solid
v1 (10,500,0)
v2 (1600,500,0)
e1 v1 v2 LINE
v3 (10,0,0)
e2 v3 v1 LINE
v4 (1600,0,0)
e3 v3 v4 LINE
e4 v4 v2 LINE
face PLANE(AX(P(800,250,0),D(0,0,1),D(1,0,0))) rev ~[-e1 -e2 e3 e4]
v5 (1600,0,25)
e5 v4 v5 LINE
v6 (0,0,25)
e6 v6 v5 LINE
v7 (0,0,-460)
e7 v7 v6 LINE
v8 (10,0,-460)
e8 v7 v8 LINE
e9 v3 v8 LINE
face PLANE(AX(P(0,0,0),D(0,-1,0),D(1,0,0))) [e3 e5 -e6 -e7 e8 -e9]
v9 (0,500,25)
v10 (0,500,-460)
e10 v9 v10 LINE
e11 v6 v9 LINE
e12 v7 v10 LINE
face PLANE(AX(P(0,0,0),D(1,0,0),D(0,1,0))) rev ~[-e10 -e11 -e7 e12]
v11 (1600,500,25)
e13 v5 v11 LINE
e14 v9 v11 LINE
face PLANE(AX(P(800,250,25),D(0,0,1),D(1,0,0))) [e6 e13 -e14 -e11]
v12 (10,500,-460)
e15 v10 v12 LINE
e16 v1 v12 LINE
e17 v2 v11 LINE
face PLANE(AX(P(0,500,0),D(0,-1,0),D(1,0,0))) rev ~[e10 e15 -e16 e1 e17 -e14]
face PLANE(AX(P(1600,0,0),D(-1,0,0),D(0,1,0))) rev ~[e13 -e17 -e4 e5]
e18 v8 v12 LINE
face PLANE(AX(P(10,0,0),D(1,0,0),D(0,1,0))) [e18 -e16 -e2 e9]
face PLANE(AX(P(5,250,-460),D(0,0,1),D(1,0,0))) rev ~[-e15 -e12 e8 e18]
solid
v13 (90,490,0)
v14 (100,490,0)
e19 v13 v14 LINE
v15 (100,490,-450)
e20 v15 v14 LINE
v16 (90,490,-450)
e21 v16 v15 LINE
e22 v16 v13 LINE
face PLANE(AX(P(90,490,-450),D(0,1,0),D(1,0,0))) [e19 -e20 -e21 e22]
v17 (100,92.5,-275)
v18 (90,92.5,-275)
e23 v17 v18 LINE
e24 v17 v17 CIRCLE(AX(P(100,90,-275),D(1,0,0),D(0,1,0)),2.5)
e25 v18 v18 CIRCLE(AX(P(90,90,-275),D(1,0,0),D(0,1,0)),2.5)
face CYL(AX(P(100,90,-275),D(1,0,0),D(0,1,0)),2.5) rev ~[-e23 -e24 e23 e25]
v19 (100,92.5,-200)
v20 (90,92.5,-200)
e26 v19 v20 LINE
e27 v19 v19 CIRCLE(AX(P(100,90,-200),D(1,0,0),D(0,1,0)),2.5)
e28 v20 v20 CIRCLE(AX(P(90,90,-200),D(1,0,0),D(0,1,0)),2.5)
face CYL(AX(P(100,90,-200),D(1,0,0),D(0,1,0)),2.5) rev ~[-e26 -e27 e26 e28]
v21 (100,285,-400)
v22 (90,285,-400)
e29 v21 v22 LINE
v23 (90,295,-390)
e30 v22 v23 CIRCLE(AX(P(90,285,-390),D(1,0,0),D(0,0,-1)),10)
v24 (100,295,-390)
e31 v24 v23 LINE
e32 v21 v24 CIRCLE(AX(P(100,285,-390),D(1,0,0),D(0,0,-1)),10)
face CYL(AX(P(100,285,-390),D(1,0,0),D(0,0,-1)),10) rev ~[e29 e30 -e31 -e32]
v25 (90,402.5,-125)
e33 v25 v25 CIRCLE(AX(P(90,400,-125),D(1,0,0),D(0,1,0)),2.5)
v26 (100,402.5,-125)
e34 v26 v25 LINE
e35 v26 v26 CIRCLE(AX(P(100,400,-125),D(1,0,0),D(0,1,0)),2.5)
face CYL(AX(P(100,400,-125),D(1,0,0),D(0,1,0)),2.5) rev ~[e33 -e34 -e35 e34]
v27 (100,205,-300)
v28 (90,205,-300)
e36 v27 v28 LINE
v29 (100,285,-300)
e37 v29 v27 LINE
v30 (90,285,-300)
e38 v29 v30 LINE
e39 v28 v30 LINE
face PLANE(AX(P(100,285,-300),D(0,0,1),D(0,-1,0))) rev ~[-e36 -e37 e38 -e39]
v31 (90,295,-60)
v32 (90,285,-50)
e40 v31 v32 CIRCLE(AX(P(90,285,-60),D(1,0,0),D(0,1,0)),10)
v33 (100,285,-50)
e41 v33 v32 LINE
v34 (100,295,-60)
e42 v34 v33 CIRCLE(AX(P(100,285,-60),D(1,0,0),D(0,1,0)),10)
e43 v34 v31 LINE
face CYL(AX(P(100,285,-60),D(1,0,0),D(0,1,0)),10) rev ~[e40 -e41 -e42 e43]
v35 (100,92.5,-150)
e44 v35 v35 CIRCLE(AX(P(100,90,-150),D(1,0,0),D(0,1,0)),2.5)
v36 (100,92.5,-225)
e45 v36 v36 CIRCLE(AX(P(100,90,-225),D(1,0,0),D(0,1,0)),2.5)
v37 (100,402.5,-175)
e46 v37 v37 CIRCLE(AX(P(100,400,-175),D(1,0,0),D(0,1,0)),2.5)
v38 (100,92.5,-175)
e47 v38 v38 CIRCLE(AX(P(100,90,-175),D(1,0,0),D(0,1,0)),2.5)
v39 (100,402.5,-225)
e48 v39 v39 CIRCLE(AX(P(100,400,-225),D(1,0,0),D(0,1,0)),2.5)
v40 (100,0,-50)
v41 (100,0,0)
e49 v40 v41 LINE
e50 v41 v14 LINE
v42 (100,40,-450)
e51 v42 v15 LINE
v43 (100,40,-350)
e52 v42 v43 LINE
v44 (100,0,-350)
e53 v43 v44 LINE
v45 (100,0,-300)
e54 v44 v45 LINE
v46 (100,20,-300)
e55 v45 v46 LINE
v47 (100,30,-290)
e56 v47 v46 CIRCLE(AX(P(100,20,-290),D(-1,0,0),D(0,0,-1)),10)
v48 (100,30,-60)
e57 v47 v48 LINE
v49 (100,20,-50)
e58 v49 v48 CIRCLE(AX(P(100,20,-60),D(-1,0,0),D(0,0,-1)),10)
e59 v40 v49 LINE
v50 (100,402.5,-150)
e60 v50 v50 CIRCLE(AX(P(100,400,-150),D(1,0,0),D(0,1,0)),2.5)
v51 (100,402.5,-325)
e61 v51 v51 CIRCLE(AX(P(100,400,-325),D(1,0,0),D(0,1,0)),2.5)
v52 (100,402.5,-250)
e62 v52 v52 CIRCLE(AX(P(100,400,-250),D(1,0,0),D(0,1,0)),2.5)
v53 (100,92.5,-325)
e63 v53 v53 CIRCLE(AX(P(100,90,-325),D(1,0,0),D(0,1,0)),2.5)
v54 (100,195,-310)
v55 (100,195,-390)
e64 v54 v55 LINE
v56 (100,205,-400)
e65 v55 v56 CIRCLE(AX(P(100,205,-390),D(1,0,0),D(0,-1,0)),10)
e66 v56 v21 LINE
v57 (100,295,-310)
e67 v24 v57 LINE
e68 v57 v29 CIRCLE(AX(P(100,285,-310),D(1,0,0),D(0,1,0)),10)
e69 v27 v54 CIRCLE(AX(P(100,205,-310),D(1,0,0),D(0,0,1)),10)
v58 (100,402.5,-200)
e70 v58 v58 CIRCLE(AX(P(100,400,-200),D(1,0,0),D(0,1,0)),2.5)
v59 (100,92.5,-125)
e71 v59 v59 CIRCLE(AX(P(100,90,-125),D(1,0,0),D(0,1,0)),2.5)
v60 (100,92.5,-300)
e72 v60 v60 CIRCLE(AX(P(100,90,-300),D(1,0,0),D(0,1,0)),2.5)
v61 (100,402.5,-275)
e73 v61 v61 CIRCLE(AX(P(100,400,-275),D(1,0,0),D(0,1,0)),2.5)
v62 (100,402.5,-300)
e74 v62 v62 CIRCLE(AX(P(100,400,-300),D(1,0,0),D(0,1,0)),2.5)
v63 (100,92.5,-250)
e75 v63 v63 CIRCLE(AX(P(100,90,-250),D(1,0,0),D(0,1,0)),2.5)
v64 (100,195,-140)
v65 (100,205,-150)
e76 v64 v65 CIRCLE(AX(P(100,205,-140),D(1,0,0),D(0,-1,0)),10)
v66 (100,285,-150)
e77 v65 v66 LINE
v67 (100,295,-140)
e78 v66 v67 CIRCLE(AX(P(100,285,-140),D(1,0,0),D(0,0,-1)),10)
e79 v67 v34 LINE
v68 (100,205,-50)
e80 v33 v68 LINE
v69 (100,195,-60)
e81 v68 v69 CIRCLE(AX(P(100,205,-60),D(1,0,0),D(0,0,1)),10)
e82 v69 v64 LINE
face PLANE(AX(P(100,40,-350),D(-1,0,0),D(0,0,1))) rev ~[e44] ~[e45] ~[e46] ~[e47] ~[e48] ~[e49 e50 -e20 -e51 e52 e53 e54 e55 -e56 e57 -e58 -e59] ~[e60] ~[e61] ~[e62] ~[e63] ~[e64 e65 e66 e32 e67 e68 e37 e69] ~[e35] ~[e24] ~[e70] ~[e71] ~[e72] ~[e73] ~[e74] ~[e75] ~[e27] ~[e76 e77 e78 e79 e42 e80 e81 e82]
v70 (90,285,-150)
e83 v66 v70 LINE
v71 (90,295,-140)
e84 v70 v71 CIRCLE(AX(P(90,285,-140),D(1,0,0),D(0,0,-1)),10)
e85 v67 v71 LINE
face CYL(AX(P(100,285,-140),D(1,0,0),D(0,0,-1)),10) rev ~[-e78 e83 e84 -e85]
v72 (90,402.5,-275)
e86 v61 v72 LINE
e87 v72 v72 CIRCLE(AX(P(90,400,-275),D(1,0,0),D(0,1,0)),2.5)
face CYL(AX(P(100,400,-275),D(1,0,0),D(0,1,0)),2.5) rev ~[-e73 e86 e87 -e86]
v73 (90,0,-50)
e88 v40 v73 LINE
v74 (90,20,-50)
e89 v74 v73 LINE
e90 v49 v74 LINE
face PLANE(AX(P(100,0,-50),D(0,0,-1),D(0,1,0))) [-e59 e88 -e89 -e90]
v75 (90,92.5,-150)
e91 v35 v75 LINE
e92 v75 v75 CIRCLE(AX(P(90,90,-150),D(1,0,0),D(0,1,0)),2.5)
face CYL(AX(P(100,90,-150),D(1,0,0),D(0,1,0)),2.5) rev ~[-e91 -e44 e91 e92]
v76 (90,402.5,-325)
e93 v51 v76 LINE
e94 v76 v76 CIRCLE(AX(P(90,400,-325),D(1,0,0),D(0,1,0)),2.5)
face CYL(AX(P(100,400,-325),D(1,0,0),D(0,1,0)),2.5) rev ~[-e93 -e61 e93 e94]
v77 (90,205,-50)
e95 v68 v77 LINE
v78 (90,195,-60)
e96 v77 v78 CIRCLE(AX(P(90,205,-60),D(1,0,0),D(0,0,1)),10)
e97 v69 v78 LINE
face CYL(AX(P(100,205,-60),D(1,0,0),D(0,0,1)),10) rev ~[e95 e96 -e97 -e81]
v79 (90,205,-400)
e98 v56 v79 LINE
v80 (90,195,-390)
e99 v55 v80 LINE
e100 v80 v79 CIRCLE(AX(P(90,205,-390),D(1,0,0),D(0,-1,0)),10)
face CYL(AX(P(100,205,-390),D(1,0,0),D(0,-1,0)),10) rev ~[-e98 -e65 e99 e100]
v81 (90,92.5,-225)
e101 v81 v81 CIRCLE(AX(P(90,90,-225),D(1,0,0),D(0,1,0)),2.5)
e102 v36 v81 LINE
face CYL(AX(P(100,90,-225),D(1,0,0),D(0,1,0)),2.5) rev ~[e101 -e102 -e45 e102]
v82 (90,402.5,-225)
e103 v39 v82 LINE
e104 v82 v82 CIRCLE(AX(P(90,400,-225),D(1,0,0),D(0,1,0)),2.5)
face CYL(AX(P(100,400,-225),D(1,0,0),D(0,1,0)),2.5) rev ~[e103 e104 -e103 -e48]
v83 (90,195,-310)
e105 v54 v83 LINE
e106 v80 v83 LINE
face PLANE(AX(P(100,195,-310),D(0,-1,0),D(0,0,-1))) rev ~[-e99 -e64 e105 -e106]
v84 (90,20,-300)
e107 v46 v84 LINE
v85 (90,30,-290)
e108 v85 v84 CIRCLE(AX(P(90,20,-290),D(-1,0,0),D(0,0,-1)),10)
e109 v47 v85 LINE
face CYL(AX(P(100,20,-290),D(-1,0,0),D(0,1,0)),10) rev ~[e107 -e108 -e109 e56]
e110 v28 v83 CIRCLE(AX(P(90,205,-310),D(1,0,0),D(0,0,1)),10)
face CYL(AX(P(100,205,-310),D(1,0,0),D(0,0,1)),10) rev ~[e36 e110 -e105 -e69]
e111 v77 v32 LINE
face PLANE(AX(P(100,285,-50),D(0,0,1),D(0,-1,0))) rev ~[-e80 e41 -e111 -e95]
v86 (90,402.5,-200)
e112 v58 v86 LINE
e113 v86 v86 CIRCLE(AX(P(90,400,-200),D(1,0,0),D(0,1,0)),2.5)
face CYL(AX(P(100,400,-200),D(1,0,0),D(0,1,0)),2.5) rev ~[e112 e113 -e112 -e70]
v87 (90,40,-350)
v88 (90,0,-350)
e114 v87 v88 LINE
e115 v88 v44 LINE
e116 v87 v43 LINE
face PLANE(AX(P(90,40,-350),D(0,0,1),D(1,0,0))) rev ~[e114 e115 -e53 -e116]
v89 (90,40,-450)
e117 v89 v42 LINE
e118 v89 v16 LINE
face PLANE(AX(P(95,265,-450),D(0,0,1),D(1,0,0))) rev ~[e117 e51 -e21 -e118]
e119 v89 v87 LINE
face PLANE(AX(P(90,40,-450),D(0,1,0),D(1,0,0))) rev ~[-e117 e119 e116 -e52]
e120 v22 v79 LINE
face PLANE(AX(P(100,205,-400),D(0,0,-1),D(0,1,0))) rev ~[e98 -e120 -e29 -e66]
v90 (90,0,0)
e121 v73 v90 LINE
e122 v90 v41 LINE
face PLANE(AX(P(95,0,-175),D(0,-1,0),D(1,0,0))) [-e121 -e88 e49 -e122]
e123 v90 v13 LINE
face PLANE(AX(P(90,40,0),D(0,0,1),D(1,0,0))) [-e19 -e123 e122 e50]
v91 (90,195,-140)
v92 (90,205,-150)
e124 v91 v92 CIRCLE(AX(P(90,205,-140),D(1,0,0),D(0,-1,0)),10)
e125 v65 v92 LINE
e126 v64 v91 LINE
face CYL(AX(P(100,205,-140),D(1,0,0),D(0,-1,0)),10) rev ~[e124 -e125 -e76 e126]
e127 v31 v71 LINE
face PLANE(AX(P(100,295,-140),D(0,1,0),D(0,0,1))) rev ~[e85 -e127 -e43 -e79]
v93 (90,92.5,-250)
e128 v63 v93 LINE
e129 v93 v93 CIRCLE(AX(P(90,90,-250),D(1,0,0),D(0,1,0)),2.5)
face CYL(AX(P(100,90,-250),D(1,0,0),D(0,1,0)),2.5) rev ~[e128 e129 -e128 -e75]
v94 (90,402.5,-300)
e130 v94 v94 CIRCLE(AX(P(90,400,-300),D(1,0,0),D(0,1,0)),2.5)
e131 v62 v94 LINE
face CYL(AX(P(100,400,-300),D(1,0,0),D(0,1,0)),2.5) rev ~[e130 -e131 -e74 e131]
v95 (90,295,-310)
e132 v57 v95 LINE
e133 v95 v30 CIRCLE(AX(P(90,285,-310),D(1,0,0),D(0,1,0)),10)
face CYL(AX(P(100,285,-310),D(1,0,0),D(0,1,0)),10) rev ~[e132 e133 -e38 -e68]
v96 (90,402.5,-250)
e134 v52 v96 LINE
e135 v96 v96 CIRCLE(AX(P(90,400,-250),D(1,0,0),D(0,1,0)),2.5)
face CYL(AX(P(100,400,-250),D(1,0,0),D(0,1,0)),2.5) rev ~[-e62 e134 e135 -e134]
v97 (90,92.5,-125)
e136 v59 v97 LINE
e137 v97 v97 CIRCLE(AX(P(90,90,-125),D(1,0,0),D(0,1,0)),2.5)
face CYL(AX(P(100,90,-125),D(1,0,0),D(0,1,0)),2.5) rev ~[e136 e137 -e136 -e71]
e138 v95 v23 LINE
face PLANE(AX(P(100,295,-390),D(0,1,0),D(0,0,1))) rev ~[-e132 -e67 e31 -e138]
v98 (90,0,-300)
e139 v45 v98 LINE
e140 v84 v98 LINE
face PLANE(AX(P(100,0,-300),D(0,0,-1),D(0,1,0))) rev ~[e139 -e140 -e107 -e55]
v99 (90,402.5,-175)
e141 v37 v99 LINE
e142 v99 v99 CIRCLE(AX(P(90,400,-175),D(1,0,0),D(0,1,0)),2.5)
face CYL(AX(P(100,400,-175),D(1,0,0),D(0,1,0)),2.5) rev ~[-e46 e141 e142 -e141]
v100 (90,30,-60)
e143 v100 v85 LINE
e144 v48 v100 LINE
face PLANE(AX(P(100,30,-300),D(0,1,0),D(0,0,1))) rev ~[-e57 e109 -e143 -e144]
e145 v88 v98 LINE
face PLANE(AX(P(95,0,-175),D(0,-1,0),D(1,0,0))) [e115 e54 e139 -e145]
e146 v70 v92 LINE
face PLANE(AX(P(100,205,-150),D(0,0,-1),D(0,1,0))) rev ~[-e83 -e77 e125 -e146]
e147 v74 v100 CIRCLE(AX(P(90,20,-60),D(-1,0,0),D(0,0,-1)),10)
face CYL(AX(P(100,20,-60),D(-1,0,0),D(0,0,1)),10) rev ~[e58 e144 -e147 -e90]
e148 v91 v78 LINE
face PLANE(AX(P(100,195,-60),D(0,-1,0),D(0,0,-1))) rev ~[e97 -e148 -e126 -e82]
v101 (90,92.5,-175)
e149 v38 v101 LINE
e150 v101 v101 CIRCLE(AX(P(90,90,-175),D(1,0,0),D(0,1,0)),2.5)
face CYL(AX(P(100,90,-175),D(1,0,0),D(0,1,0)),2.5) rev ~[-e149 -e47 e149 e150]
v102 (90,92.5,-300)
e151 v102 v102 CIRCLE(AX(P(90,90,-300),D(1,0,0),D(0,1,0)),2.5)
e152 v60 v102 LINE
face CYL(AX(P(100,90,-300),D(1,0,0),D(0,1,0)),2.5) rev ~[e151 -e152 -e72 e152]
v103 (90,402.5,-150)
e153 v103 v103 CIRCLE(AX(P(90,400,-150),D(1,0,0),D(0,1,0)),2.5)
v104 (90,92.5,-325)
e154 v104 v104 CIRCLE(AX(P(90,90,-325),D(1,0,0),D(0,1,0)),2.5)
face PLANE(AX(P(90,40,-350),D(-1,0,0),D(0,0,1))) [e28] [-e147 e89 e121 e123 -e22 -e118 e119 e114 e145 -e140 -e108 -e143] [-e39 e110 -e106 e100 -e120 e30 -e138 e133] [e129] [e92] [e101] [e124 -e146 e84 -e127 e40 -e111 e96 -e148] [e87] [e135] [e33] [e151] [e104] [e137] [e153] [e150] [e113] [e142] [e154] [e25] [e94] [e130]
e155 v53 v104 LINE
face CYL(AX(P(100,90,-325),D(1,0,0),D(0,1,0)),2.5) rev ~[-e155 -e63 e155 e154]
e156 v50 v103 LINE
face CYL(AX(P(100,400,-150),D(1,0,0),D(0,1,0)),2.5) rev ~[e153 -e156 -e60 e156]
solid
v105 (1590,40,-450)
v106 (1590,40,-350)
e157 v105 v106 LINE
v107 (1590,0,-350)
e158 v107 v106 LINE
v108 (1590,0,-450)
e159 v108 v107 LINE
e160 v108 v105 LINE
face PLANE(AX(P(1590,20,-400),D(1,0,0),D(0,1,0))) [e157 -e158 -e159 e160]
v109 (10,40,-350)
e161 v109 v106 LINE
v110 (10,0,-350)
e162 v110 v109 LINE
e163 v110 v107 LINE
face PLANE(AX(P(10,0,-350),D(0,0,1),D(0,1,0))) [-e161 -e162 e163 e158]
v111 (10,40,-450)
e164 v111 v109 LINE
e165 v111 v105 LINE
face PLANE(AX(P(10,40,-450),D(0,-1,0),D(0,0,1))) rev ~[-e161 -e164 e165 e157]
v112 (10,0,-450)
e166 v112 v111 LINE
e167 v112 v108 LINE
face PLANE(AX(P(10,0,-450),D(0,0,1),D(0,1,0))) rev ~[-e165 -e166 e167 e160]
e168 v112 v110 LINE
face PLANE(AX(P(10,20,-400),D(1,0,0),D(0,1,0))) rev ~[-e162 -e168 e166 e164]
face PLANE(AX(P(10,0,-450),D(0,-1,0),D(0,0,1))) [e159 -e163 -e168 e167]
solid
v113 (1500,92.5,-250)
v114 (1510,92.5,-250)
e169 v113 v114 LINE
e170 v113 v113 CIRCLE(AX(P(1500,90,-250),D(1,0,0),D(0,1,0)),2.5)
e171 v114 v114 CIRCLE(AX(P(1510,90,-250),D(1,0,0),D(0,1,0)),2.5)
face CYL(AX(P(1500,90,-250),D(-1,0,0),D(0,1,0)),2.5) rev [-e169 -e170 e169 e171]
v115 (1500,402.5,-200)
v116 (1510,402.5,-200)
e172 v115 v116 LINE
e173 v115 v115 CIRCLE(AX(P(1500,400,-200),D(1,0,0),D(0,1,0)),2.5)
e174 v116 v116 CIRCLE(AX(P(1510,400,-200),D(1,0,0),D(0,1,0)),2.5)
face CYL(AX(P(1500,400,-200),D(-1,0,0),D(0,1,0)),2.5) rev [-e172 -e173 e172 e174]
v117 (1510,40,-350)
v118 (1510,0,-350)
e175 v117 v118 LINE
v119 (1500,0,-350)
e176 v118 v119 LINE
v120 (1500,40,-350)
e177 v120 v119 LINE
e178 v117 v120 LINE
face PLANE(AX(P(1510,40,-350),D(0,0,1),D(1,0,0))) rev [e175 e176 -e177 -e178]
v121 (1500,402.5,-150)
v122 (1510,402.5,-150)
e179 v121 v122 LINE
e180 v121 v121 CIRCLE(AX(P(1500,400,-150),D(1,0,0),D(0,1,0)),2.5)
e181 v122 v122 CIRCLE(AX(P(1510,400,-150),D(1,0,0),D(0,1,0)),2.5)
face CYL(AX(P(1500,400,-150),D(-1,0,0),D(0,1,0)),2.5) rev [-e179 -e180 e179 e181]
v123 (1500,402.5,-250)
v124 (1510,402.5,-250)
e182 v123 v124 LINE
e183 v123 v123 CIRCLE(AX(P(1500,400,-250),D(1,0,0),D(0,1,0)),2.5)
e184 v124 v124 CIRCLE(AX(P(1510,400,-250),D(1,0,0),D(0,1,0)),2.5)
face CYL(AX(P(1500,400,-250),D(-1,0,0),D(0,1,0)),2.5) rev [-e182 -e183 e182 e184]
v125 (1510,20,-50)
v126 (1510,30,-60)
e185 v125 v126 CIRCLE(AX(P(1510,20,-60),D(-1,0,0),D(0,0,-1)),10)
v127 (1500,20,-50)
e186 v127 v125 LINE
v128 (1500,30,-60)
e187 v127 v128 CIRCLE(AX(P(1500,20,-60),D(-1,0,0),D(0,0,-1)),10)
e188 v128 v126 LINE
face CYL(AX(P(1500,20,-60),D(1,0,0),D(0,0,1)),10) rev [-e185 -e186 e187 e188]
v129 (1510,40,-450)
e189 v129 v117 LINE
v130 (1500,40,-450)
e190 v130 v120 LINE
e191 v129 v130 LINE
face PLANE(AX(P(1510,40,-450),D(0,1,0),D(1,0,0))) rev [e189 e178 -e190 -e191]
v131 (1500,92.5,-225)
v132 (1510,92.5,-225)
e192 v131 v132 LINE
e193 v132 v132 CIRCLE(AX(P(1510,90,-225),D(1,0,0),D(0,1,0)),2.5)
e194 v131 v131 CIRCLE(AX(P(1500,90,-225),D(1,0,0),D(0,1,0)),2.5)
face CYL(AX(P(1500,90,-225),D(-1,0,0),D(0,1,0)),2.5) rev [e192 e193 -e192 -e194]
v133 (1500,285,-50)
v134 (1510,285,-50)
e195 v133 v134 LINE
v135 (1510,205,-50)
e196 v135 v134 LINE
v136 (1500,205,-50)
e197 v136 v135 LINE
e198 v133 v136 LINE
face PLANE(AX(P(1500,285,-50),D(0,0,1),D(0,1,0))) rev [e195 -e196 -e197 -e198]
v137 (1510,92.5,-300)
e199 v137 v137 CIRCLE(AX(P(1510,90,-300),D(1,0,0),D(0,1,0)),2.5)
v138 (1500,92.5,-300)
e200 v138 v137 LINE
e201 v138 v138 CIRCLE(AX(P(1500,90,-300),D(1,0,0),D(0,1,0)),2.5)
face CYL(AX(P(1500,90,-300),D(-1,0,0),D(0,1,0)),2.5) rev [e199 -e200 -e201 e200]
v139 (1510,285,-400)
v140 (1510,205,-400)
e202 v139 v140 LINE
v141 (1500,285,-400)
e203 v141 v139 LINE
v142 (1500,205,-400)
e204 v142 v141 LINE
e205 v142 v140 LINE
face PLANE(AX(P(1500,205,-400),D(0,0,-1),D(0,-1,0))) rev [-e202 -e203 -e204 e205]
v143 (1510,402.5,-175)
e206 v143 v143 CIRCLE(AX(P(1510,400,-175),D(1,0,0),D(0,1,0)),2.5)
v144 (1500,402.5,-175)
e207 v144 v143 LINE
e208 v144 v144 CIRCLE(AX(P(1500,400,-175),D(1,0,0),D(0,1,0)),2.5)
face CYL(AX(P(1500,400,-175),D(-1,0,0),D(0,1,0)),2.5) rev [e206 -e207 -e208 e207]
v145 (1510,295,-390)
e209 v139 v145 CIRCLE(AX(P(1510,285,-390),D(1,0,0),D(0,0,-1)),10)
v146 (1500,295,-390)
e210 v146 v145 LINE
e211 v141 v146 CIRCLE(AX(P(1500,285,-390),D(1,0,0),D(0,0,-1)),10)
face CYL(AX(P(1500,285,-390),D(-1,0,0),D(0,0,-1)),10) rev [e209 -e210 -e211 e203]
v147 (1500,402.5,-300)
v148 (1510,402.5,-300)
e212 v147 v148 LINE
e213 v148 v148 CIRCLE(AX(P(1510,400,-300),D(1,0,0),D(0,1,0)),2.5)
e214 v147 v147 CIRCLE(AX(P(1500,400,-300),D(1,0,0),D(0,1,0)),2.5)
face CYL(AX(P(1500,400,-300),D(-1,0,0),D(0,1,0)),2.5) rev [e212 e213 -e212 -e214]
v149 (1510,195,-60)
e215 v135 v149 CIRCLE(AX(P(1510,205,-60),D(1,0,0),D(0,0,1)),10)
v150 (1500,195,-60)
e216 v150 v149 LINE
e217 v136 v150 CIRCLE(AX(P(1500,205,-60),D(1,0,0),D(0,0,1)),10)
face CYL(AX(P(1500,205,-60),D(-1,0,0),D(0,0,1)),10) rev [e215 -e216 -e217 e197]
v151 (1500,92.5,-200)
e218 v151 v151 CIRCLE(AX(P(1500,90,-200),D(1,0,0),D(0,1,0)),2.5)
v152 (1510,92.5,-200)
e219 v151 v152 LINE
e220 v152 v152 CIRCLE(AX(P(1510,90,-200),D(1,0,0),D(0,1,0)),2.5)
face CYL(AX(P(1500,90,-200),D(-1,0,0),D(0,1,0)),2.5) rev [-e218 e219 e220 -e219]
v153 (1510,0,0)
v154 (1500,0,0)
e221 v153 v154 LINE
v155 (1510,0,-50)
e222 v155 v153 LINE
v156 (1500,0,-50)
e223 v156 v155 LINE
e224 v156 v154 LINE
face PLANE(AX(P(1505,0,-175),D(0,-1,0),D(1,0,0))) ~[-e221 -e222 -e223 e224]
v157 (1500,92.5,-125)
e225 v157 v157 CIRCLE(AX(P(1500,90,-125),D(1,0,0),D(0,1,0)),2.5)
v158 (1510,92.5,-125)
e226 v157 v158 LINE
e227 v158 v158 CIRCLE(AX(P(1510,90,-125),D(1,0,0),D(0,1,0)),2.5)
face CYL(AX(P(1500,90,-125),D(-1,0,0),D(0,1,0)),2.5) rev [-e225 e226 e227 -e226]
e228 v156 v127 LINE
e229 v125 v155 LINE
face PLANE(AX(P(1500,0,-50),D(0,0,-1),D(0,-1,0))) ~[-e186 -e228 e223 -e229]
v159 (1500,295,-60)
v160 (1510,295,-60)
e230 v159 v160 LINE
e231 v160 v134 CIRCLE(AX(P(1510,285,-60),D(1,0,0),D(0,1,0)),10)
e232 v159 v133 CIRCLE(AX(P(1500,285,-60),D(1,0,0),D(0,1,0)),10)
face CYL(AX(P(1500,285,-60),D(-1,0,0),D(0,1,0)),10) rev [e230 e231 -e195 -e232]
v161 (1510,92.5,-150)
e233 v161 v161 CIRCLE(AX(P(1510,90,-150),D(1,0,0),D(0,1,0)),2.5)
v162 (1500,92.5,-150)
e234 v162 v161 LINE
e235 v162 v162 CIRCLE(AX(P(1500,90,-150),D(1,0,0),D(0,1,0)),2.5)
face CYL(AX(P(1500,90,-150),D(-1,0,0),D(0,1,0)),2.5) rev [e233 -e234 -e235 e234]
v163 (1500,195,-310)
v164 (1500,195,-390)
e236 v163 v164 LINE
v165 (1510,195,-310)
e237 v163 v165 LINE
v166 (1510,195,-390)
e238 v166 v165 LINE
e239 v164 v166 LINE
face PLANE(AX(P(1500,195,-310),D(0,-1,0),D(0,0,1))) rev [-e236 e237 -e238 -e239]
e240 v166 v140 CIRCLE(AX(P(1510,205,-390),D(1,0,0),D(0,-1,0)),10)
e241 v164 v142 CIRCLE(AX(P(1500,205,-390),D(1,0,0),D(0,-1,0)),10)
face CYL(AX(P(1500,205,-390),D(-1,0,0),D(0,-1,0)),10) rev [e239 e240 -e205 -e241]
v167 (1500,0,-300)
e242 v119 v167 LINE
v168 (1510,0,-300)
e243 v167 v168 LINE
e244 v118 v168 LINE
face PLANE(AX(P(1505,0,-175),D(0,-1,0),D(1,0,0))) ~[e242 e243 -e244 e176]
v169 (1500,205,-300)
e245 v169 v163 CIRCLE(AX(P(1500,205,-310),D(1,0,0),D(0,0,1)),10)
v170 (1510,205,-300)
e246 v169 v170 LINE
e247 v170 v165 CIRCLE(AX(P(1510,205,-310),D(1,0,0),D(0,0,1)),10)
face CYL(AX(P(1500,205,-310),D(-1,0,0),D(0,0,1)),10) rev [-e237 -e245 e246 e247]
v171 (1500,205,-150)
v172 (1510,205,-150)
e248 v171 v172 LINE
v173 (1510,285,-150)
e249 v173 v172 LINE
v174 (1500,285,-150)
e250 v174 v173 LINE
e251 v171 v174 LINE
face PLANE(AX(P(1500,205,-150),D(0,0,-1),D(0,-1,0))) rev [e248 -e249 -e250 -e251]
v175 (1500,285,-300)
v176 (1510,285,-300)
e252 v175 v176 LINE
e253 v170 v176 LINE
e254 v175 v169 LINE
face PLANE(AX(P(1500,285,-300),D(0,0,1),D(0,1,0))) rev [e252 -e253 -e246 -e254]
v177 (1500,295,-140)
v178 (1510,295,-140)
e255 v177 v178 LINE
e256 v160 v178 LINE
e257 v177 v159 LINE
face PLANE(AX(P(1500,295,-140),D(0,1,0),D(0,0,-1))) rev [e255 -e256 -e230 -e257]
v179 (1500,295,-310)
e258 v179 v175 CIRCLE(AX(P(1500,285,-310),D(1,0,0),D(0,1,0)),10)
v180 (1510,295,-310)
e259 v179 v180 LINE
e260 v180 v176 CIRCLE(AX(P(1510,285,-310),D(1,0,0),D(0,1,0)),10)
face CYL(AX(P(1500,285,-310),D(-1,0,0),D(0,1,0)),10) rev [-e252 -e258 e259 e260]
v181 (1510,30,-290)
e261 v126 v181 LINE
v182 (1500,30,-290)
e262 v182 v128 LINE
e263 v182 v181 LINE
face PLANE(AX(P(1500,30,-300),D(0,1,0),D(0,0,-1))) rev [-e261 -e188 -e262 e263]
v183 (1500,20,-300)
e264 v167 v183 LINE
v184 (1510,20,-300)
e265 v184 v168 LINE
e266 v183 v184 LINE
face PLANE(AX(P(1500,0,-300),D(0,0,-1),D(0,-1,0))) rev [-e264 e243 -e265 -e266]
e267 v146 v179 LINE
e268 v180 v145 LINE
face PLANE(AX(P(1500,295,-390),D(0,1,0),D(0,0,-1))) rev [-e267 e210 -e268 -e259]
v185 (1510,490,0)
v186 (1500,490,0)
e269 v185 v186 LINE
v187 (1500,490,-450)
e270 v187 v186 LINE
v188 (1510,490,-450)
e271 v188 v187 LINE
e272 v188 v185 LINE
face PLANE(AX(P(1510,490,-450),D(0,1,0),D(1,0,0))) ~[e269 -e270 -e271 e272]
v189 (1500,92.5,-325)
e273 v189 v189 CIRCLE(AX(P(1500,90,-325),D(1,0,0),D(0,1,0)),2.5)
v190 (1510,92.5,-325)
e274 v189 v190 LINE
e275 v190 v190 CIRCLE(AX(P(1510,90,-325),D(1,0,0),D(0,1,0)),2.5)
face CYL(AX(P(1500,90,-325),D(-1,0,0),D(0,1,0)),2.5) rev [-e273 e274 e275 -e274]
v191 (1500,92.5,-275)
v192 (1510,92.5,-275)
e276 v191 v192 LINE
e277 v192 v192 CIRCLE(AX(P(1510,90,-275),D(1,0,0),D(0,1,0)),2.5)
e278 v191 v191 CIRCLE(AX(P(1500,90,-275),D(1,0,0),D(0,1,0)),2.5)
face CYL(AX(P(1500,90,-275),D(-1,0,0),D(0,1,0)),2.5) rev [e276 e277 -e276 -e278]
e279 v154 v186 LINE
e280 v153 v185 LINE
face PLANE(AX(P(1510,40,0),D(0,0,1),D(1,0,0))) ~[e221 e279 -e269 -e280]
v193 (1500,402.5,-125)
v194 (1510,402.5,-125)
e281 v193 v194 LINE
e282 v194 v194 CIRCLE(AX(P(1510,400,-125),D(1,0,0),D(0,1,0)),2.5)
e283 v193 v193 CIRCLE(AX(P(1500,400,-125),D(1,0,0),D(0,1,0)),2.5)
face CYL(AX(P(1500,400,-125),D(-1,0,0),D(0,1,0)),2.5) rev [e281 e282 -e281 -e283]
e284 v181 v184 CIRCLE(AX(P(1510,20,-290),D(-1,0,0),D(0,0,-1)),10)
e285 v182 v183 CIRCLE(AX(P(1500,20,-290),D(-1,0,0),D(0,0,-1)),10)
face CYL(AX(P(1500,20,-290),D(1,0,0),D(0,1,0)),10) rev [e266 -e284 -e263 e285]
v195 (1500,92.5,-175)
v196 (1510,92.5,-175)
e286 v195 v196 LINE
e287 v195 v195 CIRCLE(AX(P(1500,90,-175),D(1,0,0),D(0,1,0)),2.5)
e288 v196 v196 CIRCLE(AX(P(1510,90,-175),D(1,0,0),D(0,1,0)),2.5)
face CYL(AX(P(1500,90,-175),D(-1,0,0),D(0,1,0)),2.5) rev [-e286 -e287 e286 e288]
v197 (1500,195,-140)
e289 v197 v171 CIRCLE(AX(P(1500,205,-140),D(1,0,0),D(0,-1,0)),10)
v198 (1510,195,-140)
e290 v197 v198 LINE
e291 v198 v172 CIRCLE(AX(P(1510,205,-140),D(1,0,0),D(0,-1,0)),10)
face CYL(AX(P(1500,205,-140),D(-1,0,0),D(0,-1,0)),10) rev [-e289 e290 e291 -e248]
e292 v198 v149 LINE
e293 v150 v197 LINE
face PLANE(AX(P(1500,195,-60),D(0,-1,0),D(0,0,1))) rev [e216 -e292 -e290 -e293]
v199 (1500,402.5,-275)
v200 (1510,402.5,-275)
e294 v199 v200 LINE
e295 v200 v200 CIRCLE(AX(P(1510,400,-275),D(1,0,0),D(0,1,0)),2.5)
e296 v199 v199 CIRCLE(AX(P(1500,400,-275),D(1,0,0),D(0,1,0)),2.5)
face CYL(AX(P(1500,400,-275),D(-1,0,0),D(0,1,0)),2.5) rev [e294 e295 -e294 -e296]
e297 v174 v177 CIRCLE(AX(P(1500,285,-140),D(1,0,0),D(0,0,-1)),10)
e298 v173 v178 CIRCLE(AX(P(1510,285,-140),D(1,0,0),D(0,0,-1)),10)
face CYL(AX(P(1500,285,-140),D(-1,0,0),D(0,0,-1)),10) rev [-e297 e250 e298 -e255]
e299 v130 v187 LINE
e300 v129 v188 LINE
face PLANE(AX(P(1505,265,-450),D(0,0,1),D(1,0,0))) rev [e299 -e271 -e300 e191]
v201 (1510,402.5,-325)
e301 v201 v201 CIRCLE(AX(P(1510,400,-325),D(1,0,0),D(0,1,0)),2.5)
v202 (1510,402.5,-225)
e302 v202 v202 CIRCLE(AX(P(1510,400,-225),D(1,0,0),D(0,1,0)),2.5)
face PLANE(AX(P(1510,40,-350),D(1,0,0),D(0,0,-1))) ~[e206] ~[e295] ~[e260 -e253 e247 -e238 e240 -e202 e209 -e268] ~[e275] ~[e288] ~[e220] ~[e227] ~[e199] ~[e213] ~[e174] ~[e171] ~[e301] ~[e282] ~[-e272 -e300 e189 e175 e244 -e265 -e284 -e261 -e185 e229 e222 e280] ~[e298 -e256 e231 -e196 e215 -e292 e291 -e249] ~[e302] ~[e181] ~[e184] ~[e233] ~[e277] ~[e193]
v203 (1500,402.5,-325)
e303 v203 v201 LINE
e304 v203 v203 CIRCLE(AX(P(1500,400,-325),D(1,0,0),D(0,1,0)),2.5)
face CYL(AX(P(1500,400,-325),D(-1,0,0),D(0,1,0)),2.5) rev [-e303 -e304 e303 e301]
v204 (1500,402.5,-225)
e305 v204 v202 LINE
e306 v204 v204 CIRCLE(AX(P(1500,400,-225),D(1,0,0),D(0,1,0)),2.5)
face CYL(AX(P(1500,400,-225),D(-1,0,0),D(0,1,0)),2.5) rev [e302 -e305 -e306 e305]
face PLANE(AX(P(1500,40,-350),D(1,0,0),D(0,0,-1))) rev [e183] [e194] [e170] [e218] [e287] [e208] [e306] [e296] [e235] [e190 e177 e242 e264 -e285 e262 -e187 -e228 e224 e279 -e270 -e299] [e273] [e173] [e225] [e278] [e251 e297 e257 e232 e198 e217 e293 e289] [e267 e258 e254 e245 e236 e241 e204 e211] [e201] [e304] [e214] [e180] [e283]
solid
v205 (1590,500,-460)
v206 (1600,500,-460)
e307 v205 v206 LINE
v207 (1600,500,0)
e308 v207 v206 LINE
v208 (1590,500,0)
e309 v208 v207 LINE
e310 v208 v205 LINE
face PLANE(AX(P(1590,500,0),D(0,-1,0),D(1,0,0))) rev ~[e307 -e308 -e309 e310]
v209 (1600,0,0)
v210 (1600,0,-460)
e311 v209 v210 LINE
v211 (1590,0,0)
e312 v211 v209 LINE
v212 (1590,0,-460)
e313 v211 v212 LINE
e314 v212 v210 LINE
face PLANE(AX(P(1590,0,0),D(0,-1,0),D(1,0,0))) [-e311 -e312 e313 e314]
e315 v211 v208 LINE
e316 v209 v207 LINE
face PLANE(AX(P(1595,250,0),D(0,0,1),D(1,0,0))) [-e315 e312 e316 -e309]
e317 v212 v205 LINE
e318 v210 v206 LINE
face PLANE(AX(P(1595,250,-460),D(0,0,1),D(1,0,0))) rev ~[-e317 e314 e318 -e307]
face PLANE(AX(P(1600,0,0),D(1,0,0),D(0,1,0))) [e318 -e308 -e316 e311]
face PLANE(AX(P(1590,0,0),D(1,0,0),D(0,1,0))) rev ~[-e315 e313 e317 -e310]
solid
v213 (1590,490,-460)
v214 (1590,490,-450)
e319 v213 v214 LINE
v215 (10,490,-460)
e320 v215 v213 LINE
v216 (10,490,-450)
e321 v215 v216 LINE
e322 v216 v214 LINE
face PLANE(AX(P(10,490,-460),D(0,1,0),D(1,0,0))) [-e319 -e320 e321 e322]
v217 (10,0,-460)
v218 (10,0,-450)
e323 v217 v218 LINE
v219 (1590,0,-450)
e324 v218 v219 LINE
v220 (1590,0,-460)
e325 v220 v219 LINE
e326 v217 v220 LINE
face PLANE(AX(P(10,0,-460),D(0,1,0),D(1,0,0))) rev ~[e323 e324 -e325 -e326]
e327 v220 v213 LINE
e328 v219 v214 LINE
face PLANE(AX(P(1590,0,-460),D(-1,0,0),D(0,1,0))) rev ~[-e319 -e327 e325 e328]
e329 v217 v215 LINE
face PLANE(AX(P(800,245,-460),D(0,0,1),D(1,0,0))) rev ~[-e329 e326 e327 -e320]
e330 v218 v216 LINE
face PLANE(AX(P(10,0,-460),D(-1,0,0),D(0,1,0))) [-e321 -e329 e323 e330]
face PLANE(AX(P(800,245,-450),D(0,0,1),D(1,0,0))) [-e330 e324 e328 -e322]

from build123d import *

# Parameters (mm, degrees)
F0_W      = 1600
F0_H      = 500
F1_DEPTH  = 25
F3_W      = 1580
F3_H      = 490
F4_DEPTH  = 10
F5_W      = 10
F5_H      = 500
F6_DEPTH  = 460
F7_W      = 10
F7_H      = 500
F8_DEPTH  = 460
F9_W      = 40
F9_H      = 100
F10_DEPTH = 1580
F11_W     = 10
F11_H     = 450
F12_DEPTH = 450
F13_W     = 10
F13_H     = 350
F14_DEPTH = 40
F16_W     = 30
F16_H     = 250
F17_DEPTH = 100.001
F18_R     = 10
F20_DEPTH = 100.001
F21_R     = 2.5
F22_DEPTH = 100.001


with BuildPart() as f1:
    # F0 (on Top) → F1 (new body)
    with BuildSketch(Plane.XY):
        with Locations((800, 250)):
            Rectangle(F0_W, F0_H)
    extrude(amount=F1_DEPTH)

    # F5 (on face) → F6 (join, through all)
    with BuildSketch(Plane.XY):
        with Locations((5, 250)):
            Rectangle(F5_W, F5_H)
    extrude(amount=-F6_DEPTH)


with BuildPart() as f4:
    # F3 (on offset) → F4 (new body)
    with BuildSketch(Plane.XY.offset(-460)):
        with Locations((800, 245)):
            Rectangle(F3_W, F3_H)
    extrude(amount=F4_DEPTH)


with BuildPart() as f8:
    # F7 (on face) → F8 (new body, through all)
    with BuildSketch(Plane.XY):
        with Locations((1595, 250)):
            Rectangle(F7_W, F7_H)
    extrude(amount=-F8_DEPTH)


with BuildPart() as f10:
    # F9 (on face) → F10 (new body, through all)
    with BuildSketch(Plane.YZ.offset(10)):
        with Locations((20, -400)):
            Rectangle(F9_W, F9_H)
    extrude(amount=F10_DEPTH)


with BuildPart() as f12:
    # F11 (on face) → F12 (new body, through all)
    with BuildSketch(Plane.XY.offset(-450)):
        with Locations((95, 265)):
            Rectangle(F11_W, F11_H)
    extrude(amount=F12_DEPTH)

    # F13 (on face) → F14 (join, through all)
    with BuildSketch(Plane.XZ.offset(-40)):
        with Locations((95, -175)):
            Rectangle(F13_W, F13_H)
    extrude(amount=F14_DEPTH)

    # F15: union 

    # F16 (on face) → F17 (cut, through all)
    with BuildSketch(Plane.YZ.offset(100)):
        with Locations((15, -175)):
            Rectangle(F16_W, F16_H)
    extrude(amount=-F17_DEPTH, mode=Mode.SUBTRACT)

    # F18
    f18_edges = [f12.edges().sort_by_distance(p)[0] for p in [
        (95, 30, -50),
        (95, 30, -300),
    ]]
    fillet(f18_edges, radius=F18_R)

    # F19 (on face) → F20 (cut, through all)
    with BuildSketch(Plane.YZ.offset(100)):
        with BuildLine():
            Line((285, -50), (205, -50))
            ThreePointArc((205, -50), (197.9289321881, -52.9289321881), (195, -60))
            Line((195, -60), (195, -140))
            ThreePointArc((195, -140), (197.9289321881, -147.0710678119), (205, -150))
            Line((205, -150), (285, -150))
            ThreePointArc((285, -150), (292.0710678119, -147.0710678119), (295, -140))
            Line((295, -140), (295, -60))
            ThreePointArc((295, -60), (292.0710678119, -52.9289321881), (285, -50))
        make_face()
        with BuildLine():
            Line((285, -300), (205, -300))
            ThreePointArc((205, -300), (197.9289321881, -302.9289321881), (195, -310))
            Line((195, -310), (195, -390))
            ThreePointArc((195, -390), (197.9289321881, -397.0710678119), (205, -400))
            Line((205, -400), (285, -400))
            ThreePointArc((285, -400), (292.0710678119, -397.0710678119), (295, -390))
            Line((295, -390), (295, -310))
            ThreePointArc((295, -310), (292.0710678119, -302.9289321881), (285, -300))
        make_face()
    extrude(amount=-F20_DEPTH, mode=Mode.SUBTRACT)

    # F21 (on face) → F22 (cut, through all)
    with BuildSketch(Plane.YZ.offset(100)):
        with Locations((90, -325)):
            Circle(F21_R)
        with Locations((90, -300)):
            Circle(F21_R)
        with Locations((90, -275)):
            Circle(F21_R)
        with Locations((90, -250)):
            Circle(F21_R)
        with Locations((90, -225)):
            Circle(F21_R)
        with Locations((90, -200)):
            Circle(F21_R)
        with Locations((90, -175)):
            Circle(F21_R)
        with Locations((90, -150)):
            Circle(F21_R)
        with Locations((90, -125)):
            Circle(F21_R)
        with Locations((400, -325)):
            Circle(F21_R)
        with Locations((400, -300)):
            Circle(F21_R)
        with Locations((400, -275)):
            Circle(F21_R)
        with Locations((400, -250)):
            Circle(F21_R)
        with Locations((400, -225)):
            Circle(F21_R)
        with Locations((400, -200)):
            Circle(F21_R)
        with Locations((400, -175)):
            Circle(F21_R)
        with Locations((400, -150)):
            Circle(F21_R)
        with Locations((400, -125)):
            Circle(F21_R)
    extrude(amount=-F22_DEPTH, mode=Mode.SUBTRACT)


with BuildPart() as f24_1:
    # F24: instance of F12
    add(f12.part.mirror(Plane(origin=(800, 250, -230), x_dir=(0, 1, 0), z_dir=(1, 0, 0))))


solid = Compound([f1.part, f4.part, f8.part, f10.part, f12.part, f24_1.part])
